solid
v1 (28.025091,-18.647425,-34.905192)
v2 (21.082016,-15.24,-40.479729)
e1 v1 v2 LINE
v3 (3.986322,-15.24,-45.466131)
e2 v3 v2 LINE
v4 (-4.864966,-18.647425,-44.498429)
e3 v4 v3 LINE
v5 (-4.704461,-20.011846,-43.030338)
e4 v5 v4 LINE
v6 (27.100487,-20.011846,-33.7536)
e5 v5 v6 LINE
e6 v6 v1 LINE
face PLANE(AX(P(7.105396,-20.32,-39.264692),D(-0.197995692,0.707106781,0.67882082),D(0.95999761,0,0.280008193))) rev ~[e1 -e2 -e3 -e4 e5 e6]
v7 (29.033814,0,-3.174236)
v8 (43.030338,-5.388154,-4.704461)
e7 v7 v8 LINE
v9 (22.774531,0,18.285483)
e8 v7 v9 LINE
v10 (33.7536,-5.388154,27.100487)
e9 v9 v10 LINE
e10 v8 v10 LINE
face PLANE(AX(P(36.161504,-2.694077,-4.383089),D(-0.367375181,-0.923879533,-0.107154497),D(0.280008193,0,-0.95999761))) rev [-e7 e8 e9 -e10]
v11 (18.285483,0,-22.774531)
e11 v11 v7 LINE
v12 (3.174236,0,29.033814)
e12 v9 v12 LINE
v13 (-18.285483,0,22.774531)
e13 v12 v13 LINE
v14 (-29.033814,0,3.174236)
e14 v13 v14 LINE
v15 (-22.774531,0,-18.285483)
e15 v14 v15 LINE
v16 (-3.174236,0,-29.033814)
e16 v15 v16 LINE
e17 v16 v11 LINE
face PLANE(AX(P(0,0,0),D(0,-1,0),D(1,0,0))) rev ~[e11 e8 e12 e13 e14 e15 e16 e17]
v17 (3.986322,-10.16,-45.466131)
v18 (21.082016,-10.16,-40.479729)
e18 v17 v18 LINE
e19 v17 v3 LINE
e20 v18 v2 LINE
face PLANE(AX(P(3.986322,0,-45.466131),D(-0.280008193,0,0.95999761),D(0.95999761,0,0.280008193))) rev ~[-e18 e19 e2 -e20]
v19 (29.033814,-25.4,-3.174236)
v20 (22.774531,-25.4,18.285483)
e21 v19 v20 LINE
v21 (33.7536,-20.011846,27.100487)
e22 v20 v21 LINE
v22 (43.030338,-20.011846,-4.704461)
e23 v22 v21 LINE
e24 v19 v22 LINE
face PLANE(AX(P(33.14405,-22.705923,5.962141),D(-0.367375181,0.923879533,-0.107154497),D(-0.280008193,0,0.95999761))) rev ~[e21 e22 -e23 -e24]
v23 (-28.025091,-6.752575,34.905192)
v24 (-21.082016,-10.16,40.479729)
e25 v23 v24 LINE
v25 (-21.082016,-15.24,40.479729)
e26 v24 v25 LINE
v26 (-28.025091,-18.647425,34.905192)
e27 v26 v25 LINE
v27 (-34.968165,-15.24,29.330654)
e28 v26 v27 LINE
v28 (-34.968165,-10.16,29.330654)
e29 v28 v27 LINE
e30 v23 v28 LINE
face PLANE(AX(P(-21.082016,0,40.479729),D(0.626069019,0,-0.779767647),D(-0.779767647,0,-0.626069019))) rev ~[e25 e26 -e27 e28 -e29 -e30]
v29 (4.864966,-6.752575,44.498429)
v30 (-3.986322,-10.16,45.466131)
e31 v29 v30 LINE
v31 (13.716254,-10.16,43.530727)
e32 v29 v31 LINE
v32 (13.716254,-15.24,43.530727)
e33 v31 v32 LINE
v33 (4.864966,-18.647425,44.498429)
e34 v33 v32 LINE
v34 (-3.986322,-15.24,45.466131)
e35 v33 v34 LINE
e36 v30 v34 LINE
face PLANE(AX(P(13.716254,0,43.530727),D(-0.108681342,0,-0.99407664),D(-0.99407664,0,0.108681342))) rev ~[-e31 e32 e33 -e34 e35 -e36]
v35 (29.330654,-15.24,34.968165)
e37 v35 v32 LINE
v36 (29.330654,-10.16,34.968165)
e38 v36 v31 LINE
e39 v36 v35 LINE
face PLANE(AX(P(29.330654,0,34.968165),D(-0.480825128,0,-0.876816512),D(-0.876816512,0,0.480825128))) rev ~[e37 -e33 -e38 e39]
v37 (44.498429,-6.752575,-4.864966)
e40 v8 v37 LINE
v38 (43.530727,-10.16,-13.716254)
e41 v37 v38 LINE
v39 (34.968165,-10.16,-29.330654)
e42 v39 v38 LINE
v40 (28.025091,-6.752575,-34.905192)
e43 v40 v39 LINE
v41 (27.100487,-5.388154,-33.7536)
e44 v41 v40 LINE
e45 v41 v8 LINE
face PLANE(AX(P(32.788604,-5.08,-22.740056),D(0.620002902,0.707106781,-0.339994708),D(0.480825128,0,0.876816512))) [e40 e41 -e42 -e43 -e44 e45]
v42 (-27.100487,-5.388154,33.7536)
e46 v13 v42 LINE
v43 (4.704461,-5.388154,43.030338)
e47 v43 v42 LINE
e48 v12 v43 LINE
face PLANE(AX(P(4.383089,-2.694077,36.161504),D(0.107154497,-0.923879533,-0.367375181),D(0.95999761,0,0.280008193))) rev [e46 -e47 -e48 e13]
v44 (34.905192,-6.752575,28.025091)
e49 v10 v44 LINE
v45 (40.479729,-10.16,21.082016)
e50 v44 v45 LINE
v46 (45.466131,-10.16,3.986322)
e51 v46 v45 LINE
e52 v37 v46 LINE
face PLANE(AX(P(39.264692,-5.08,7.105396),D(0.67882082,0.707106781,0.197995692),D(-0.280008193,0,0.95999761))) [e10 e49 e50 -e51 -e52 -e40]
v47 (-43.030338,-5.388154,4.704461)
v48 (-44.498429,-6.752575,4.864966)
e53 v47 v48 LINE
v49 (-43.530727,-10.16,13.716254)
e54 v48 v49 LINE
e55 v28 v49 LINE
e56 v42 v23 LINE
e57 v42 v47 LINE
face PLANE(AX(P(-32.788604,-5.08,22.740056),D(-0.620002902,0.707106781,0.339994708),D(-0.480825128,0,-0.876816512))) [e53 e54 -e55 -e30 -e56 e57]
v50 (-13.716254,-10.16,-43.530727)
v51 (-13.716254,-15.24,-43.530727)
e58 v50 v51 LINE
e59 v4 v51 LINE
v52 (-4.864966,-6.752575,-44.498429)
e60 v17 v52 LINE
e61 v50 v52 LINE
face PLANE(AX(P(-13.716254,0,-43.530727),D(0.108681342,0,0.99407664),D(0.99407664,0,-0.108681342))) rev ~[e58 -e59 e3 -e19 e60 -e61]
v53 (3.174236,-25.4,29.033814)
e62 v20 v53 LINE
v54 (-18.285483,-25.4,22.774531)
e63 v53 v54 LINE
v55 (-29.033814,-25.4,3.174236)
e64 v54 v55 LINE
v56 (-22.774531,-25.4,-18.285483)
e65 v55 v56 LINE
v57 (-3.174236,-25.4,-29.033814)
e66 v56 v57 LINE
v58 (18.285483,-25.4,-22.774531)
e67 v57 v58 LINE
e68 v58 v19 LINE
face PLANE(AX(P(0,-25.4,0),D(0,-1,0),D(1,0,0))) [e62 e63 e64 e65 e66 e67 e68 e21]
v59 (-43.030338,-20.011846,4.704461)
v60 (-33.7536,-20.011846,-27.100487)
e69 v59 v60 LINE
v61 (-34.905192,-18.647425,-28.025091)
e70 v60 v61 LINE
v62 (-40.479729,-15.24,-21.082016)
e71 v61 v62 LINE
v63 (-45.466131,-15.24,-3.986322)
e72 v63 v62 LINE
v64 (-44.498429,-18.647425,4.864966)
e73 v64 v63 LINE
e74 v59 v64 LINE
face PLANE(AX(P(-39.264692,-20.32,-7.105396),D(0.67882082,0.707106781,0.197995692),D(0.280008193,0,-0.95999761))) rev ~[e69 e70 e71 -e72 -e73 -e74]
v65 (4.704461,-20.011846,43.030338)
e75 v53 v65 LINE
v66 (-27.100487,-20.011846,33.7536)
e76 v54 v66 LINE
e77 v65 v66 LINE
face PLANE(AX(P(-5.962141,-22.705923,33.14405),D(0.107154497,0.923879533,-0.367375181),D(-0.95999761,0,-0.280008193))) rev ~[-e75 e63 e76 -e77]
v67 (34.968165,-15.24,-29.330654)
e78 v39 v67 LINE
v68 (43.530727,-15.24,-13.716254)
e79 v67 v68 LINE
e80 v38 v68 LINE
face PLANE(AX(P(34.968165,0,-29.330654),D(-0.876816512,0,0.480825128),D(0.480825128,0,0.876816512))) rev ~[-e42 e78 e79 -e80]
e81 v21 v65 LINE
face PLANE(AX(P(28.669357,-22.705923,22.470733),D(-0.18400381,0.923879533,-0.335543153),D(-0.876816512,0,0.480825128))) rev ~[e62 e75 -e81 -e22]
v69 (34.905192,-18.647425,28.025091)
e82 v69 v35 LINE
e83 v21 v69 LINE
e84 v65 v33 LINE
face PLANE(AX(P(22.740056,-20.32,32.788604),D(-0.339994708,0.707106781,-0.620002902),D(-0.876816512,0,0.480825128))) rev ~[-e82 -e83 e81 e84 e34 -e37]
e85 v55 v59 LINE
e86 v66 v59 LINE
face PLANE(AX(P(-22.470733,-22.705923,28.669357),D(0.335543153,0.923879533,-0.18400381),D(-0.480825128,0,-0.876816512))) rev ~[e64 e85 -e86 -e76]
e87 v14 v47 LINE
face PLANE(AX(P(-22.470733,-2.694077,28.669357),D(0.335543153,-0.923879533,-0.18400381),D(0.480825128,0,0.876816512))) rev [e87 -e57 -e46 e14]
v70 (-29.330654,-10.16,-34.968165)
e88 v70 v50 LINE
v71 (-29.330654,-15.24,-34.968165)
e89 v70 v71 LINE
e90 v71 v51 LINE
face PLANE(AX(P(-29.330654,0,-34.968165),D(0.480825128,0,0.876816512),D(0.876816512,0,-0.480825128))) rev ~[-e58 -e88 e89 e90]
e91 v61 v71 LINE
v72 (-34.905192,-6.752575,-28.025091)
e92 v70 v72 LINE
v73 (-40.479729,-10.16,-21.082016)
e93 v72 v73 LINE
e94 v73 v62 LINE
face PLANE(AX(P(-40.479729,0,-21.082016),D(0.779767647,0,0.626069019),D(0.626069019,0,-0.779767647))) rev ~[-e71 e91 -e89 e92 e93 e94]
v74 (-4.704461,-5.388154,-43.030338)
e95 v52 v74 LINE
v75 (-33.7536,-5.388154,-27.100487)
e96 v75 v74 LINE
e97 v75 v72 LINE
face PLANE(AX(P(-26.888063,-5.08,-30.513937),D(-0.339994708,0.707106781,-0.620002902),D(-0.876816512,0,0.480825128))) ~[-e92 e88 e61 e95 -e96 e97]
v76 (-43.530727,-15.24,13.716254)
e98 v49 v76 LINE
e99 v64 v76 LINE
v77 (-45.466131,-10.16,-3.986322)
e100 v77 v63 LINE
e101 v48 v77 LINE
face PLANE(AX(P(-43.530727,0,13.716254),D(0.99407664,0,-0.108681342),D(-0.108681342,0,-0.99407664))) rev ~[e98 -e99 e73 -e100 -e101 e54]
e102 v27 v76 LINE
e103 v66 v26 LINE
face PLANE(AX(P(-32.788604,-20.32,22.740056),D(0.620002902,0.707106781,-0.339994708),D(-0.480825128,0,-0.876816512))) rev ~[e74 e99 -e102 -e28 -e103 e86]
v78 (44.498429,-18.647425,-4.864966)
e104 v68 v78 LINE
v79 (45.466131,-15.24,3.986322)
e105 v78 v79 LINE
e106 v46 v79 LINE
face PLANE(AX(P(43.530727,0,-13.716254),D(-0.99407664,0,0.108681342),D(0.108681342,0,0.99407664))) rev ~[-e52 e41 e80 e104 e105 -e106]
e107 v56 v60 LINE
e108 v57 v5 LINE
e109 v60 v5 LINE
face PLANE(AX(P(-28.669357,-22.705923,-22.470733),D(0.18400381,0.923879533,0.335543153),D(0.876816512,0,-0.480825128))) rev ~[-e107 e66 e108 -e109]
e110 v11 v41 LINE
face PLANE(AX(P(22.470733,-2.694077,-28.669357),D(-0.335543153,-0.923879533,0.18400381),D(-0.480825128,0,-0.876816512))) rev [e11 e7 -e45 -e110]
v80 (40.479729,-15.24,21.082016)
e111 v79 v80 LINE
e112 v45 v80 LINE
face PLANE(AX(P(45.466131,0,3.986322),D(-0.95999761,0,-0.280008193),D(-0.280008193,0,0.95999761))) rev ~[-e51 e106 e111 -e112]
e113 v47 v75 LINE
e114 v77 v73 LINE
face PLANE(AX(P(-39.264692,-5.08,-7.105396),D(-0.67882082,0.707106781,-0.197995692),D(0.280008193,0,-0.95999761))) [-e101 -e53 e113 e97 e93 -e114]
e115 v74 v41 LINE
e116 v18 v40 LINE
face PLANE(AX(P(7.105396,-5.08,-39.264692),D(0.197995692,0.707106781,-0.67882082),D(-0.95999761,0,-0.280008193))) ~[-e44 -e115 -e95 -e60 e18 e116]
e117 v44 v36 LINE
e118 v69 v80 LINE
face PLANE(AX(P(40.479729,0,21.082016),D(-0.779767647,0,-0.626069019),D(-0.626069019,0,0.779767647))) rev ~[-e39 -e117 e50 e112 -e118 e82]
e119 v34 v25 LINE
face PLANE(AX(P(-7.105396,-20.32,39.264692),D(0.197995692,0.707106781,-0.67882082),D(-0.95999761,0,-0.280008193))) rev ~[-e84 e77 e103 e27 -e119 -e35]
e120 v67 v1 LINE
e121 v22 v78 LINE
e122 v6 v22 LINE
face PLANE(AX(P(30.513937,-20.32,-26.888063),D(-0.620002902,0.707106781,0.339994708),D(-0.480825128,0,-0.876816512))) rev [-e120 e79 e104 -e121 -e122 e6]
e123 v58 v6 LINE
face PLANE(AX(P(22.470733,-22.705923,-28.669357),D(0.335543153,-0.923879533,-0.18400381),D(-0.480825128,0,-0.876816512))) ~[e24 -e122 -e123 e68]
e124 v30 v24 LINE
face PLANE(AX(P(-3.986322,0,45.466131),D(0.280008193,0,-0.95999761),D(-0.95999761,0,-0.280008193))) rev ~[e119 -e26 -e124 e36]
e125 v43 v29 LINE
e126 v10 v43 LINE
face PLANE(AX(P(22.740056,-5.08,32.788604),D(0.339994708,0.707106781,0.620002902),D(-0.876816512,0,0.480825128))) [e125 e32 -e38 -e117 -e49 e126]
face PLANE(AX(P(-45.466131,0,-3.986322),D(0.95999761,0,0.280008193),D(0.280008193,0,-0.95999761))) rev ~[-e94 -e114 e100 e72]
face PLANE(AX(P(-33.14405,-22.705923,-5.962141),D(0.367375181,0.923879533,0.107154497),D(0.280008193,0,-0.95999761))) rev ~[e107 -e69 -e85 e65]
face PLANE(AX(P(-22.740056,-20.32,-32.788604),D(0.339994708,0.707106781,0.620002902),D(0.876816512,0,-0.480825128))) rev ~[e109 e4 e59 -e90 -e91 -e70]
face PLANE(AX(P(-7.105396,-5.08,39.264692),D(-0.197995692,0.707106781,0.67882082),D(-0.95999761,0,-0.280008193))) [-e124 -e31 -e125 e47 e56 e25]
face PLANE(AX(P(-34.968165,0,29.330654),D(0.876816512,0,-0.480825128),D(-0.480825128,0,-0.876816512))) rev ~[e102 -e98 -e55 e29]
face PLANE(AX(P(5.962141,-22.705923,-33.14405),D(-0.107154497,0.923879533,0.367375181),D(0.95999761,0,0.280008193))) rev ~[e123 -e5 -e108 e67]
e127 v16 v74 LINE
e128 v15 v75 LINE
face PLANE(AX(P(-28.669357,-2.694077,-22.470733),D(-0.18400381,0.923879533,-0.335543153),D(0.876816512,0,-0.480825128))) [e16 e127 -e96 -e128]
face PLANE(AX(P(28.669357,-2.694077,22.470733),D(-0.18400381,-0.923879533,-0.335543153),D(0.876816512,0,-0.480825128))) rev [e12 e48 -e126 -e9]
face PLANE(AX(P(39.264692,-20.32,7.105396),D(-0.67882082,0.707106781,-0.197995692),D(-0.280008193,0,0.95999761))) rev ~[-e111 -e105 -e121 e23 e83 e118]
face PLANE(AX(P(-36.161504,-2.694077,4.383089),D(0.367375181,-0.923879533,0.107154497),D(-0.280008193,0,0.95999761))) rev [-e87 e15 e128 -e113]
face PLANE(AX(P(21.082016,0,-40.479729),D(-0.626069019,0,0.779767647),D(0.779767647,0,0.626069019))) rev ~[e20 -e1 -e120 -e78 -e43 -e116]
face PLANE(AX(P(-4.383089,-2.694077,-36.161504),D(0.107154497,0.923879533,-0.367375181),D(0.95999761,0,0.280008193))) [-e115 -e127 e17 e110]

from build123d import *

# Parameters (mm, degrees)
F1_DEPTH = 25.4
F2_SIZE  = 10.16
F3_SIZE  = 7.62
F4_SIZE  = 7.62
F5_SIZE  = 10.16
F6_SIZE  = 7.62


with BuildPart() as f1:
    # F0 (on Front) → F1 (new body)
    with BuildSketch(Plane.XZ):
        Polygon((40.479728647, 21.0820164172), (29.3306543749, 34.9681649717), (13.7162538572, 43.5307273965), (-3.986321972, 45.4661311822), (-21.0820164172, 40.479728647), (-34.9681649717, 29.3306543749), (-43.5307273965, 13.7162538572), (-45.4661311822, -3.986321972), (-40.479728647, -21.0820164172), (-29.3306543749, -34.9681649717), (-13.7162538572, -43.5307273965), (3.986321972, -45.4661311822), (21.0820164172, -40.479728647), (34.9681649717, -29.3306543749), (43.5307273965, -13.7162538572), (45.4661311822, 3.986321972), align=None)
    extrude(amount=F1_DEPTH)

    # F2 (call 1 of 8: OpenCascade refuses the feature's edges together)
    f2_edges = [f1.edges().sort_by_distance(p)[0] for p in [
        (39.249446, -25.4, -21.523454),
    ]]
    chamfer(f2_edges, length=F2_SIZE)

    # F2#2 (call 2 of 8)
    f2_2_edges = [f1.edges().sort_by_distance(p)[0] for p in [
        (42.97293, -25.4, 12.534169),
    ]]
    chamfer(f2_2_edges, length=F2_SIZE)

    # F2#3 (call 3 of 8)
    f2_3_edges = [f1.edges().sort_by_distance(p)[0] for p in [
        (21.523454, -25.4, 39.249446),
    ]]
    chamfer(f2_3_edges, length=F2_SIZE)

    # F2#4 (call 4 of 8)
    f2_4_edges = [f1.edges().sort_by_distance(p)[0] for p in [
        (-12.534169, -25.4, 42.97293),
    ]]
    chamfer(f2_4_edges, length=F2_SIZE)

    # F2#5 (call 5 of 8)
    f2_5_edges = [f1.edges().sort_by_distance(p)[0] for p in [
        (-39.249446, -25.4, 21.523454),
    ]]
    chamfer(f2_5_edges, length=F2_SIZE)

    # F2#6 (call 6 of 8)
    f2_6_edges = [f1.edges().sort_by_distance(p)[0] for p in [
        (-42.97293, -25.4, -12.534169),
    ]]
    chamfer(f2_6_edges, length=F2_SIZE)

    # F2#7 (call 7 of 8)
    f2_7_edges = [f1.edges().sort_by_distance(p)[0] for p in [
        (-21.523454, -25.4, -39.249446),
    ]]
    chamfer(f2_7_edges, length=F2_SIZE)

    # F2#8 (call 8 of 8)
    f2_8_edges = [f1.edges().sort_by_distance(p)[0] for p in [
        (12.534169, -25.4, -42.97293),
    ]]
    chamfer(f2_8_edges, length=F2_SIZE)

    # F3
    f3_edges = [f1.edges().sort_by_distance(p)[0] for p in [
        (-30.34099, -25.4, 16.638271),
        (16.638271, -25.4, 30.34099),
        (30.34099, -25.4, -16.638271),
        (-16.638271, -25.4, -30.34099),
    ]]
    chamfer(f3_edges, length=F3_SIZE)

    # F4
    f4_edges = [f1.edges().sort_by_distance(p)[0] for p in [
        (-9.689286, -25.4, 33.219354),
        (33.219354, -25.4, 9.689286),
        (9.689286, -25.4, -33.219354),
        (-33.219354, -25.4, -9.689286),
    ]]
    chamfer(f4_edges, length=F4_SIZE)

    # F5 (call 1 of 8: OpenCascade refuses the feature's edges together)
    f5_edges = [f1.edges().sort_by_distance(p)[0] for p in [
        (-21.523454, 0, -39.249446),
    ]]
    chamfer(f5_edges, length=F5_SIZE)

    # F5#2 (call 2 of 8)
    f5_2_edges = [f1.edges().sort_by_distance(p)[0] for p in [
        (12.534169, 0, -42.97293),
    ]]
    chamfer(f5_2_edges, length=F5_SIZE)

    # F5#3 (call 3 of 8)
    f5_3_edges = [f1.edges().sort_by_distance(p)[0] for p in [
        (39.249446, 0, -21.523454),
    ]]
    chamfer(f5_3_edges, length=F5_SIZE)

    # F5#4 (call 4 of 8)
    f5_4_edges = [f1.edges().sort_by_distance(p)[0] for p in [
        (42.97293, 0, 12.534169),
    ]]
    chamfer(f5_4_edges, length=F5_SIZE)

    # F5#5 (call 5 of 8)
    f5_5_edges = [f1.edges().sort_by_distance(p)[0] for p in [
        (21.523454, 0, 39.249446),
    ]]
    chamfer(f5_5_edges, length=F5_SIZE)

    # F5#6 (call 6 of 8)
    f5_6_edges = [f1.edges().sort_by_distance(p)[0] for p in [
        (-12.534169, 0, 42.97293),
    ]]
    chamfer(f5_6_edges, length=F5_SIZE)

    # F5#7 (call 7 of 8)
    f5_7_edges = [f1.edges().sort_by_distance(p)[0] for p in [
        (-39.249446, 0, 21.523454),
    ]]
    chamfer(f5_7_edges, length=F5_SIZE)

    # F5#8 (call 8 of 8)
    f5_8_edges = [f1.edges().sort_by_distance(p)[0] for p in [
        (-42.97293, 0, -12.534169),
    ]]
    chamfer(f5_8_edges, length=F5_SIZE)

    # F6
    f6_edges = [f1.edges().sort_by_distance(p)[0] for p in [
        (16.638271, 0, 30.34099),
        (-9.689286, 0, 33.219354),
        (-30.34099, 0, 16.638271),
        (-33.219354, 0, -9.689286),
        (-16.638271, 0, -30.34099),
        (9.689286, 0, -33.219354),
        (30.34099, 0, -16.638271),
        (33.219354, 0, 9.689286),
    ]]
    chamfer(f6_edges, length=F6_SIZE)


solid = f1.part
